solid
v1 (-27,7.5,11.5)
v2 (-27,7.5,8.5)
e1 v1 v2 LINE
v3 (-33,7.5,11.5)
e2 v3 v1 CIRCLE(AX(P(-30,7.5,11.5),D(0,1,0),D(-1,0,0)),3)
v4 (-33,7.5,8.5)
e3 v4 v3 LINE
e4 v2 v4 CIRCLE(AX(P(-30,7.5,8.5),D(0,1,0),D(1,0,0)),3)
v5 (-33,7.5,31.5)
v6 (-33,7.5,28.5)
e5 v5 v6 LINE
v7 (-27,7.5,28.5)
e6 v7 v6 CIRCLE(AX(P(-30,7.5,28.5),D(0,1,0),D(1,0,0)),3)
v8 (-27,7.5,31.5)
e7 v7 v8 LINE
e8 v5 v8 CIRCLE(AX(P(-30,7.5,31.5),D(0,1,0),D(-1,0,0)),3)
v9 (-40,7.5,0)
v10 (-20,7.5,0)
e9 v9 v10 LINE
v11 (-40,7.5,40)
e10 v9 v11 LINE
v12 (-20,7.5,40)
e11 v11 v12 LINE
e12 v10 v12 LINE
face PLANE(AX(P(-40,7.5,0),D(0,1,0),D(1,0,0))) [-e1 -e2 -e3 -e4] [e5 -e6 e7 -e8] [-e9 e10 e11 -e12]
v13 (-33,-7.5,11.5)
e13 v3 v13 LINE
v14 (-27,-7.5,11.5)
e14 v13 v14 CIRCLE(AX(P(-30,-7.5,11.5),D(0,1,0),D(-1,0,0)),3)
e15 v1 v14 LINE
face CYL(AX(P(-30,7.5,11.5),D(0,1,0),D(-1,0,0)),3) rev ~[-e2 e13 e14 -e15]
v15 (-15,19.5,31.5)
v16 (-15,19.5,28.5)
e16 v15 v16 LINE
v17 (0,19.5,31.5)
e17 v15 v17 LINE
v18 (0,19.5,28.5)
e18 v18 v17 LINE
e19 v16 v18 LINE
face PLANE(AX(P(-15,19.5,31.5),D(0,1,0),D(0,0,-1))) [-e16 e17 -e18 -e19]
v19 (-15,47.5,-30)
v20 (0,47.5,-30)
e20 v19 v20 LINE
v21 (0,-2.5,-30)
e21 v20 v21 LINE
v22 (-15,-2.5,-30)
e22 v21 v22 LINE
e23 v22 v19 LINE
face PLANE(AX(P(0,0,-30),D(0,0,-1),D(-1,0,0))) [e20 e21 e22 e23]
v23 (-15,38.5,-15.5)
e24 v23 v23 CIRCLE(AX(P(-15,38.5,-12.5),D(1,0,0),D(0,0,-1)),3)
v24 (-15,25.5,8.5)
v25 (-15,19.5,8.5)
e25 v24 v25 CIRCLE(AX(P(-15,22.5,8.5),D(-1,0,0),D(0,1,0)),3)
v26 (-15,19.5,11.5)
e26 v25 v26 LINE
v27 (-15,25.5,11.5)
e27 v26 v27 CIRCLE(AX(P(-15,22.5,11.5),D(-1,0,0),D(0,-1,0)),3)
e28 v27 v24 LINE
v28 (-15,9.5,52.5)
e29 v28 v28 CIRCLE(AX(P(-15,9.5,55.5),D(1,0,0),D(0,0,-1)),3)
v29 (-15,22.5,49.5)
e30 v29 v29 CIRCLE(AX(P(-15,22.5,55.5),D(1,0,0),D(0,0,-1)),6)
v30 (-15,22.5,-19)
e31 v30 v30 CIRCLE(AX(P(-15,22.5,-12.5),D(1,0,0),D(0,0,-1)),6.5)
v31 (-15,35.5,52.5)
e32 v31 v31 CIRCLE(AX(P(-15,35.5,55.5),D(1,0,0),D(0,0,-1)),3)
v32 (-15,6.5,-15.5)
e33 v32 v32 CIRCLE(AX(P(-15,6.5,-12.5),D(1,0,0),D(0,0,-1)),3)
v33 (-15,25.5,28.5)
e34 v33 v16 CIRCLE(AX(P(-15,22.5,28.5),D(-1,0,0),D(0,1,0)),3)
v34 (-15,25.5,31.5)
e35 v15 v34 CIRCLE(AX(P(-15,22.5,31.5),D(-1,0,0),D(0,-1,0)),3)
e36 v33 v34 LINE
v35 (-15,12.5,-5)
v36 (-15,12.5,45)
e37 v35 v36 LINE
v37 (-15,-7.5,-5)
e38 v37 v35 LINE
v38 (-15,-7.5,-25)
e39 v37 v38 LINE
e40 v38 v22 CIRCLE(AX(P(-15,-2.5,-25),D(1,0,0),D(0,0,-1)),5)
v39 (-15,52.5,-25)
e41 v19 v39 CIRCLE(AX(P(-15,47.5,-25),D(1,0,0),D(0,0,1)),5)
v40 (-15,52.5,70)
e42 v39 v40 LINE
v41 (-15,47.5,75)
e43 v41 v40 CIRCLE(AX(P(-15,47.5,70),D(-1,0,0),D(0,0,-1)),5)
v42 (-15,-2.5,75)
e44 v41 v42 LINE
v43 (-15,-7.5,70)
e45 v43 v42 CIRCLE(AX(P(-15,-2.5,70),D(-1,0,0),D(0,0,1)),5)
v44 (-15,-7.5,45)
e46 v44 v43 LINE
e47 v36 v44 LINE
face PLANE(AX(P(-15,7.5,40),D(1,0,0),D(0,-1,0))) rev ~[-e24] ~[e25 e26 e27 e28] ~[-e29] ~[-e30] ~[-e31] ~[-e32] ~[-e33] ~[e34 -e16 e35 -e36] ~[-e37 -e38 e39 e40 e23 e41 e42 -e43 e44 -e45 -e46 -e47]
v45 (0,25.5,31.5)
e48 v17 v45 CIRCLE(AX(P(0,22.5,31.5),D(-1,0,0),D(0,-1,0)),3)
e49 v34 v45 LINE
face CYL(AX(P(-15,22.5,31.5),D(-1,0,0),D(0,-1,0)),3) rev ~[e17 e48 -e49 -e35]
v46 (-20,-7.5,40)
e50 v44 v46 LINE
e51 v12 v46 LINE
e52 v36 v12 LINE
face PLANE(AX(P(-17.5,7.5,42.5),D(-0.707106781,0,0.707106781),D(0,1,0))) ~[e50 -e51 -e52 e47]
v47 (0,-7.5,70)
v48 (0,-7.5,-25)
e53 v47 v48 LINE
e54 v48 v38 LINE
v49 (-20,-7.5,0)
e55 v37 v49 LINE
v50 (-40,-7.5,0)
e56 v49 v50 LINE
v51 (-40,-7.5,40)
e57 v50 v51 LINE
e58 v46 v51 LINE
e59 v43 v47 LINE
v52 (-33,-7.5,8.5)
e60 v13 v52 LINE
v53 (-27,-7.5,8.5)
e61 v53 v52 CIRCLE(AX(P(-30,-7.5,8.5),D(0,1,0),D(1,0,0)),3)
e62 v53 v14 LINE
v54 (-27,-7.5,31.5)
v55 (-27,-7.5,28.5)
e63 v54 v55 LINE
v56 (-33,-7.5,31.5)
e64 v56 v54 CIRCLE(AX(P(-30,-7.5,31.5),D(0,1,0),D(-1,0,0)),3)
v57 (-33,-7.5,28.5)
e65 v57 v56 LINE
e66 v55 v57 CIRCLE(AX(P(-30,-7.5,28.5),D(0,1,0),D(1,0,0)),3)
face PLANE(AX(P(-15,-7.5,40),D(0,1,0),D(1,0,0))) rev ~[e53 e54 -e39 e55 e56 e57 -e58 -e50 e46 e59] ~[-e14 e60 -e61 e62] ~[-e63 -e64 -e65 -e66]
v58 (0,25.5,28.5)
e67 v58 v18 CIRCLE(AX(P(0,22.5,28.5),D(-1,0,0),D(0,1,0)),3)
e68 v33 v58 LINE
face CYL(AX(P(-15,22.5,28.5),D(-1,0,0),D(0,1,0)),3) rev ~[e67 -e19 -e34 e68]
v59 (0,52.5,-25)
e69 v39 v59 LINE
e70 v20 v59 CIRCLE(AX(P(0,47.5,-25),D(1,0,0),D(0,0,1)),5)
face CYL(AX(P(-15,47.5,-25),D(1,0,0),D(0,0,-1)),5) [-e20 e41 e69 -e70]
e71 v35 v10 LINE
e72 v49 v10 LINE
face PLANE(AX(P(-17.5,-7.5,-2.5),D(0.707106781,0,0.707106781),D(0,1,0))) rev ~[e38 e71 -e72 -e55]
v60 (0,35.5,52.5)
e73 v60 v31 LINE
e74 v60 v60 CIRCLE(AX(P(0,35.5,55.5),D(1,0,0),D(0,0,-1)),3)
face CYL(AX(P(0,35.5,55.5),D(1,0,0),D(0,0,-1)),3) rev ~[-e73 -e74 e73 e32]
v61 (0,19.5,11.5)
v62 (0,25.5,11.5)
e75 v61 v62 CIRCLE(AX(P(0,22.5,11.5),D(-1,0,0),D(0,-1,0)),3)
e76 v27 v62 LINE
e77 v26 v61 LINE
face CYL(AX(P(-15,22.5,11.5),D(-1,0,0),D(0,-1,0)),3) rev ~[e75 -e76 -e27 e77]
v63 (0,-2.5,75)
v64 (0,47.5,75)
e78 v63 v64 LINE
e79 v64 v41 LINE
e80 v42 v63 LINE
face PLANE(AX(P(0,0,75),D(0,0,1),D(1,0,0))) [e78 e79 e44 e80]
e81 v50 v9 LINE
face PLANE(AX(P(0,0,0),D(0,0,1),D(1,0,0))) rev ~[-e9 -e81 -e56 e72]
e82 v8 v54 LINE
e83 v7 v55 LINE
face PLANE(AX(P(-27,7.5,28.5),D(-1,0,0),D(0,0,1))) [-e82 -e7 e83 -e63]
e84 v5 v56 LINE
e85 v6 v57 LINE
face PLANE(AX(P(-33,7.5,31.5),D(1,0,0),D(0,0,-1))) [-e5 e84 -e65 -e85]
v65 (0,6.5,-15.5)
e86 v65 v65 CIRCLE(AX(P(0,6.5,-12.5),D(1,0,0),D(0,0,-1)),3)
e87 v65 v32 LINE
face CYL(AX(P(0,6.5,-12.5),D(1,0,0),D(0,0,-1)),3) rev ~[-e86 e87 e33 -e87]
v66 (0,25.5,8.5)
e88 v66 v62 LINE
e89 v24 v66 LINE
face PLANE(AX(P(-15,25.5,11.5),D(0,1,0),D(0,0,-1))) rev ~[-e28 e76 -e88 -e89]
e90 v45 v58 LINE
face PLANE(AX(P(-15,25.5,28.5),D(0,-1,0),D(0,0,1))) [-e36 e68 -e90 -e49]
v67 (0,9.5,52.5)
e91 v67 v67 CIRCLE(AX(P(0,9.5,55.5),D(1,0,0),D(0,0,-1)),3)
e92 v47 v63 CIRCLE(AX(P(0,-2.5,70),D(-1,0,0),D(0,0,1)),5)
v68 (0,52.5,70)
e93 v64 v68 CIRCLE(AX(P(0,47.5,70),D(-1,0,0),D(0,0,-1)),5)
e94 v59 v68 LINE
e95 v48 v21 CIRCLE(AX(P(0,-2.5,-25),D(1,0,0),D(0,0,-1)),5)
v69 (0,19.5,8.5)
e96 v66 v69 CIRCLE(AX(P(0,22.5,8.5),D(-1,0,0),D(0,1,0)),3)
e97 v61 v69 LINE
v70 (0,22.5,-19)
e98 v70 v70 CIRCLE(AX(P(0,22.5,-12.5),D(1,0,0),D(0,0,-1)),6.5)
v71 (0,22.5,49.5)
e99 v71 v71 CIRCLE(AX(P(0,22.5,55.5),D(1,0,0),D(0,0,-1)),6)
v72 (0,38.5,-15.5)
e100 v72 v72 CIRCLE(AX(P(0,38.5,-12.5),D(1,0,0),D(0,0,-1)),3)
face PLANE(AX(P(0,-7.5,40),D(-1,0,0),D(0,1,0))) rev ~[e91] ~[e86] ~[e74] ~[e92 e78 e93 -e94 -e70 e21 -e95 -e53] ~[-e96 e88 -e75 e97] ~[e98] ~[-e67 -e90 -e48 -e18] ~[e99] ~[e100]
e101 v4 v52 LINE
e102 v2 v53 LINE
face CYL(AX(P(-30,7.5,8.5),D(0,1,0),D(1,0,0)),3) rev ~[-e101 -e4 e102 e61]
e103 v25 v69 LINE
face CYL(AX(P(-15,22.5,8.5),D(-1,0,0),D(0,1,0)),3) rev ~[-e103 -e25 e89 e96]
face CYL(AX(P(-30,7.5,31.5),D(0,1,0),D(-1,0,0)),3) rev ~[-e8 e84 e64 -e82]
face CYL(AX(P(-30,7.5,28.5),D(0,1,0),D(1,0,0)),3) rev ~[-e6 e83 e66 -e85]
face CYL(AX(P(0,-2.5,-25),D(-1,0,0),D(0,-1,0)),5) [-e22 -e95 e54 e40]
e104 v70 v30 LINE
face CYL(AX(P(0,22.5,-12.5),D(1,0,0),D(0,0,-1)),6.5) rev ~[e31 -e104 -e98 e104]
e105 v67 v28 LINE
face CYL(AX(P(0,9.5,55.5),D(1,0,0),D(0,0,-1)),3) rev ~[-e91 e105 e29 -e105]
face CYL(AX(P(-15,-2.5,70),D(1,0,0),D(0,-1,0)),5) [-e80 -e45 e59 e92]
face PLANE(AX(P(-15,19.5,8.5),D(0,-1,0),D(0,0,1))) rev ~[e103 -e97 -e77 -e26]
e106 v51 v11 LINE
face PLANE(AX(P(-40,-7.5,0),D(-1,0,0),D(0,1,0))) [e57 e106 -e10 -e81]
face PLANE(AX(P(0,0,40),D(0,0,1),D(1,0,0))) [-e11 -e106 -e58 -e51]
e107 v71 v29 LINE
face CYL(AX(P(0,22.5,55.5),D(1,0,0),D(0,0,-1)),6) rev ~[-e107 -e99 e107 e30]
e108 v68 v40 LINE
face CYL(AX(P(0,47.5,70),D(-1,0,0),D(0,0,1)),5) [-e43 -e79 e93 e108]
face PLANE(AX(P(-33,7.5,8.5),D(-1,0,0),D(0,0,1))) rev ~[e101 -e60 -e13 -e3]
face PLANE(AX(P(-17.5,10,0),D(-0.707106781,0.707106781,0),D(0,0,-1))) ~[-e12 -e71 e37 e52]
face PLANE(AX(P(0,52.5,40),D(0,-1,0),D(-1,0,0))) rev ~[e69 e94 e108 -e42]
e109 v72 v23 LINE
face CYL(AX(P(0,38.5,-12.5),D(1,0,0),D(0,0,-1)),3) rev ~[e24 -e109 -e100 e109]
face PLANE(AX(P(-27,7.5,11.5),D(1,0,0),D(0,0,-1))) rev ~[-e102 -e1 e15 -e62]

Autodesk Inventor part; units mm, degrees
ref_plane "YZ Plane" through (0, 0, 0) normal (1, 0, 0) x (0, 1, 0)
ref_plane "XZ Plane" through (0, 0, 0) normal (0, 1, 0) x (-1, 0, 0)
ref_plane "XY Plane" through (0, 0, 0) normal (0, 0, 1) x (1, 0, 0)
sketch "Sketch1" plane through (0, 0, 0) normal (0, 0, 1) x (1, 0, 0)
  line L0 (-40, 7.5) -> (0, 7.5)
  line L1 (0, 7.5) -> (0, -7.5)
  line L2 (0, -7.5) -> (-40, -7.5)
  line L3 (-40, -7.5) -> (-40, 7.5)
  line L4 (-15, 52.5) -> (0, 52.5)
  line L5 (0, 52.5) -> (0, 7.5)
  line L6 (0, 7.5) -> (-15, 7.5)
  line L7 (-15, 7.5) -> (-15, 52.5)
  point P0 (0, 0)
  point P1 (-15, 7.5)
  dimension "d0" = 15
  dimension "d1" = 40
  dimension "d2" = 60
extrude "Extrusion1" add sketch "Sketch1" along normal blind 40
sketch "Sketch2" plane through (-15, 7.5, 0) normal (-1, 0, 0) x (0, 0, 1)
  line L0 (8.5, 15) -> (11.5, 15) construction
  line L1 (8.5, 12) -> (11.5, 12)
  line L2 (11.5, 18) -> (8.5, 18)
  arc A0 (8.5, 18) -> (8.5, 12) centre (8.5, 15) ccw
  arc A1 (11.5, 12) -> (11.5, 18) centre (11.5, 15) ccw
  line L3 (0, 45) -> (0, 0) projected
  line L4 (0, 45) -> (40, 45) projected
  line L5 (20, 21.547) -> (20, 15) construction
  line L6 (31.5, 15) -> (28.5, 15) construction
  line L7 (31.5, 12) -> (28.5, 12)
  line L8 (28.5, 18) -> (31.5, 18)
  arc A2 (31.5, 12) -> (31.5, 18) centre (31.5, 15) ccw
  arc A3 (28.5, 18) -> (28.5, 12) centre (28.5, 15) ccw
  point P0 (0, -7.5)
  point P1 (10, 15)
  point P2 (20, 18.2735)
  point P3 (20, 45)
  point P4 (30, 15)
  dimension "d5" = 6
  dimension "d6" = 3
  dimension "d7" = 10
  dimension "d8" = 30
extrude "Extrusion2" cut sketch "Sketch2" against normal through all
sketch "Sketch3" plane through (-40, 7.5, 0) normal (0, 1, 0) x (1, 0, 0)
  line L0 (10, -8.5) -> (10, -11.5) construction
  line L1 (7, -8.5) -> (7, -11.5)
  line L2 (13, -11.5) -> (13, -8.5)
  arc A0 (13, -8.5) -> (7, -8.5) centre (10, -8.5) ccw
  arc A1 (7, -11.5) -> (13, -11.5) centre (10, -11.5) ccw
  line L3 (25, 0) -> (0, 0) projected
  line L4 (0, 0) -> (0, -40) projected
  line L5 (15.2557, -20) -> (9.287, -20) construction
  line L6 (10, -31.5) -> (10, -28.5) construction
  line L7 (7, -31.5) -> (7, -28.5)
  line L8 (13, -28.5) -> (13, -31.5)
  arc A2 (7, -31.5) -> (13, -31.5) centre (10, -31.5) ccw
  arc A3 (13, -28.5) -> (7, -28.5) centre (10, -28.5) ccw
  point P0 (40, 0)
  point P1 (10, -10)
  point P2 (12.2713, -20)
  point P3 (0, -20)
  point P4 (10, -30)
  dimension "d11" = 3
  dimension "d12" = 6
  dimension "d13" = 10
  dimension "d14" = 10
extrude "Extrusion3" cut sketch "Sketch3" against normal through all
sketch "Sketch5" plane through (0, 0, 0) normal (0, 0, -1) x (-1, 0, 0)
  line L0 (0, -7.5) -> (15, -7.5)
  line L1 (15, -7.5) -> (15, 52.5)
  line L2 (15, 52.5) -> (0, 52.5)
  line L3 (0, 52.5) -> (0, -7.5)
  line L4 (0, -7.5) -> (0, 52.5) projected
  line L5 (40, -7.5) -> (0, -7.5) projected
  line L6 (0, 52.5) -> (15, 52.5) projected
  line L7 (15, 52.5) -> (15, 7.5) projected
  point P0 (0, 0)
  point P1 (10, 15)
extrude "Extrusion4" add sketch "Sketch5" along normal blind 30
sketch "Sketch6" plane through (0, -7.5, 40) normal (1, 0, 0) x (0, 0, -1)
  circle A0 centre (52.5, 14) radius 3
  circle A1 centre (52.5, 46) radius 3
  line L0 (70, 0) -> (0, 0) projected
  line L1 (70, 60) -> (70, 0) projected
  circle A2 centre (52.5, 30) radius 6.5
  point P0 (40, 7.5)
  dimension "d23" = 32
  dimension "d24" = 14
  dimension "d25" = 17.5
  dimension "d26" = 6
  dimension "d31" = 13
  dimension "d32" = 16
extrude "Extrusion5" cut sketch "Sketch6" against normal through all
sketch "Sketch7" plane through (0, 0, 40) normal (0, 0, 1) x (1, 0, 0)
  line L0 (0, 52.5) -> (-15, 52.5)
  line L1 (-15, 52.5) -> (-15, -7.5)
  line L2 (-15, -7.5) -> (0, -7.5)
  line L3 (0, -7.5) -> (0, 52.5)
  line L4 (0, -7.5) -> (0, 52.5) projected
  line L5 (0, 52.5) -> (-15, 52.5) projected
  line L6 (-15, 52.5) -> (-15, 7.5) projected
  line L7 (-40, -7.5) -> (0, -7.5) projected
  point P0 (0, 0)
  point P1 (-10, 15)
extrude "Extrusion6" add sketch "Sketch7" along normal blind 35
sketch "Sketch8" plane through (0, -7.5, -30) normal (1, 0, 0) x (0, 0, -1)
  circle A0 centre (-85.5, 30) radius 6
  circle A1 centre (-85.5, 17) radius 3
  circle A2 centre (-85.5, 43) radius 3
  line L0 (-105, 60) -> (0, 60) projected
  line L1 (-105, 0) -> (-105, 60) projected
  point P0 (-30, 7.5)
  dimension "d33" = 12
  dimension "d34" = 6
  dimension "d35" = 17
  dimension "d36" = 19.5
  dimension "d37" = 26
  dimension "d38" = 13
extrude "Extrusion7" cut sketch "Sketch8" against normal through all
chamfer "Chamfer2" distance 5 angle 45 3 edges at (-15, 0, 40) (-15, 7.5, 20) (-15, 0, 0)
fillet "Fillet2" radius 5 4 edges at (-7.5, 52.5, 75) (-7.5, -7.5, 75) (-7.5, 52.5, -30) (-7.5, -7.5, -30)
equation "\"d32\" = 0.5 * d23"
equation "\"d38\" = 0.5 * d37"
properties part number "0008-10-033" material "ABS Plastic"
